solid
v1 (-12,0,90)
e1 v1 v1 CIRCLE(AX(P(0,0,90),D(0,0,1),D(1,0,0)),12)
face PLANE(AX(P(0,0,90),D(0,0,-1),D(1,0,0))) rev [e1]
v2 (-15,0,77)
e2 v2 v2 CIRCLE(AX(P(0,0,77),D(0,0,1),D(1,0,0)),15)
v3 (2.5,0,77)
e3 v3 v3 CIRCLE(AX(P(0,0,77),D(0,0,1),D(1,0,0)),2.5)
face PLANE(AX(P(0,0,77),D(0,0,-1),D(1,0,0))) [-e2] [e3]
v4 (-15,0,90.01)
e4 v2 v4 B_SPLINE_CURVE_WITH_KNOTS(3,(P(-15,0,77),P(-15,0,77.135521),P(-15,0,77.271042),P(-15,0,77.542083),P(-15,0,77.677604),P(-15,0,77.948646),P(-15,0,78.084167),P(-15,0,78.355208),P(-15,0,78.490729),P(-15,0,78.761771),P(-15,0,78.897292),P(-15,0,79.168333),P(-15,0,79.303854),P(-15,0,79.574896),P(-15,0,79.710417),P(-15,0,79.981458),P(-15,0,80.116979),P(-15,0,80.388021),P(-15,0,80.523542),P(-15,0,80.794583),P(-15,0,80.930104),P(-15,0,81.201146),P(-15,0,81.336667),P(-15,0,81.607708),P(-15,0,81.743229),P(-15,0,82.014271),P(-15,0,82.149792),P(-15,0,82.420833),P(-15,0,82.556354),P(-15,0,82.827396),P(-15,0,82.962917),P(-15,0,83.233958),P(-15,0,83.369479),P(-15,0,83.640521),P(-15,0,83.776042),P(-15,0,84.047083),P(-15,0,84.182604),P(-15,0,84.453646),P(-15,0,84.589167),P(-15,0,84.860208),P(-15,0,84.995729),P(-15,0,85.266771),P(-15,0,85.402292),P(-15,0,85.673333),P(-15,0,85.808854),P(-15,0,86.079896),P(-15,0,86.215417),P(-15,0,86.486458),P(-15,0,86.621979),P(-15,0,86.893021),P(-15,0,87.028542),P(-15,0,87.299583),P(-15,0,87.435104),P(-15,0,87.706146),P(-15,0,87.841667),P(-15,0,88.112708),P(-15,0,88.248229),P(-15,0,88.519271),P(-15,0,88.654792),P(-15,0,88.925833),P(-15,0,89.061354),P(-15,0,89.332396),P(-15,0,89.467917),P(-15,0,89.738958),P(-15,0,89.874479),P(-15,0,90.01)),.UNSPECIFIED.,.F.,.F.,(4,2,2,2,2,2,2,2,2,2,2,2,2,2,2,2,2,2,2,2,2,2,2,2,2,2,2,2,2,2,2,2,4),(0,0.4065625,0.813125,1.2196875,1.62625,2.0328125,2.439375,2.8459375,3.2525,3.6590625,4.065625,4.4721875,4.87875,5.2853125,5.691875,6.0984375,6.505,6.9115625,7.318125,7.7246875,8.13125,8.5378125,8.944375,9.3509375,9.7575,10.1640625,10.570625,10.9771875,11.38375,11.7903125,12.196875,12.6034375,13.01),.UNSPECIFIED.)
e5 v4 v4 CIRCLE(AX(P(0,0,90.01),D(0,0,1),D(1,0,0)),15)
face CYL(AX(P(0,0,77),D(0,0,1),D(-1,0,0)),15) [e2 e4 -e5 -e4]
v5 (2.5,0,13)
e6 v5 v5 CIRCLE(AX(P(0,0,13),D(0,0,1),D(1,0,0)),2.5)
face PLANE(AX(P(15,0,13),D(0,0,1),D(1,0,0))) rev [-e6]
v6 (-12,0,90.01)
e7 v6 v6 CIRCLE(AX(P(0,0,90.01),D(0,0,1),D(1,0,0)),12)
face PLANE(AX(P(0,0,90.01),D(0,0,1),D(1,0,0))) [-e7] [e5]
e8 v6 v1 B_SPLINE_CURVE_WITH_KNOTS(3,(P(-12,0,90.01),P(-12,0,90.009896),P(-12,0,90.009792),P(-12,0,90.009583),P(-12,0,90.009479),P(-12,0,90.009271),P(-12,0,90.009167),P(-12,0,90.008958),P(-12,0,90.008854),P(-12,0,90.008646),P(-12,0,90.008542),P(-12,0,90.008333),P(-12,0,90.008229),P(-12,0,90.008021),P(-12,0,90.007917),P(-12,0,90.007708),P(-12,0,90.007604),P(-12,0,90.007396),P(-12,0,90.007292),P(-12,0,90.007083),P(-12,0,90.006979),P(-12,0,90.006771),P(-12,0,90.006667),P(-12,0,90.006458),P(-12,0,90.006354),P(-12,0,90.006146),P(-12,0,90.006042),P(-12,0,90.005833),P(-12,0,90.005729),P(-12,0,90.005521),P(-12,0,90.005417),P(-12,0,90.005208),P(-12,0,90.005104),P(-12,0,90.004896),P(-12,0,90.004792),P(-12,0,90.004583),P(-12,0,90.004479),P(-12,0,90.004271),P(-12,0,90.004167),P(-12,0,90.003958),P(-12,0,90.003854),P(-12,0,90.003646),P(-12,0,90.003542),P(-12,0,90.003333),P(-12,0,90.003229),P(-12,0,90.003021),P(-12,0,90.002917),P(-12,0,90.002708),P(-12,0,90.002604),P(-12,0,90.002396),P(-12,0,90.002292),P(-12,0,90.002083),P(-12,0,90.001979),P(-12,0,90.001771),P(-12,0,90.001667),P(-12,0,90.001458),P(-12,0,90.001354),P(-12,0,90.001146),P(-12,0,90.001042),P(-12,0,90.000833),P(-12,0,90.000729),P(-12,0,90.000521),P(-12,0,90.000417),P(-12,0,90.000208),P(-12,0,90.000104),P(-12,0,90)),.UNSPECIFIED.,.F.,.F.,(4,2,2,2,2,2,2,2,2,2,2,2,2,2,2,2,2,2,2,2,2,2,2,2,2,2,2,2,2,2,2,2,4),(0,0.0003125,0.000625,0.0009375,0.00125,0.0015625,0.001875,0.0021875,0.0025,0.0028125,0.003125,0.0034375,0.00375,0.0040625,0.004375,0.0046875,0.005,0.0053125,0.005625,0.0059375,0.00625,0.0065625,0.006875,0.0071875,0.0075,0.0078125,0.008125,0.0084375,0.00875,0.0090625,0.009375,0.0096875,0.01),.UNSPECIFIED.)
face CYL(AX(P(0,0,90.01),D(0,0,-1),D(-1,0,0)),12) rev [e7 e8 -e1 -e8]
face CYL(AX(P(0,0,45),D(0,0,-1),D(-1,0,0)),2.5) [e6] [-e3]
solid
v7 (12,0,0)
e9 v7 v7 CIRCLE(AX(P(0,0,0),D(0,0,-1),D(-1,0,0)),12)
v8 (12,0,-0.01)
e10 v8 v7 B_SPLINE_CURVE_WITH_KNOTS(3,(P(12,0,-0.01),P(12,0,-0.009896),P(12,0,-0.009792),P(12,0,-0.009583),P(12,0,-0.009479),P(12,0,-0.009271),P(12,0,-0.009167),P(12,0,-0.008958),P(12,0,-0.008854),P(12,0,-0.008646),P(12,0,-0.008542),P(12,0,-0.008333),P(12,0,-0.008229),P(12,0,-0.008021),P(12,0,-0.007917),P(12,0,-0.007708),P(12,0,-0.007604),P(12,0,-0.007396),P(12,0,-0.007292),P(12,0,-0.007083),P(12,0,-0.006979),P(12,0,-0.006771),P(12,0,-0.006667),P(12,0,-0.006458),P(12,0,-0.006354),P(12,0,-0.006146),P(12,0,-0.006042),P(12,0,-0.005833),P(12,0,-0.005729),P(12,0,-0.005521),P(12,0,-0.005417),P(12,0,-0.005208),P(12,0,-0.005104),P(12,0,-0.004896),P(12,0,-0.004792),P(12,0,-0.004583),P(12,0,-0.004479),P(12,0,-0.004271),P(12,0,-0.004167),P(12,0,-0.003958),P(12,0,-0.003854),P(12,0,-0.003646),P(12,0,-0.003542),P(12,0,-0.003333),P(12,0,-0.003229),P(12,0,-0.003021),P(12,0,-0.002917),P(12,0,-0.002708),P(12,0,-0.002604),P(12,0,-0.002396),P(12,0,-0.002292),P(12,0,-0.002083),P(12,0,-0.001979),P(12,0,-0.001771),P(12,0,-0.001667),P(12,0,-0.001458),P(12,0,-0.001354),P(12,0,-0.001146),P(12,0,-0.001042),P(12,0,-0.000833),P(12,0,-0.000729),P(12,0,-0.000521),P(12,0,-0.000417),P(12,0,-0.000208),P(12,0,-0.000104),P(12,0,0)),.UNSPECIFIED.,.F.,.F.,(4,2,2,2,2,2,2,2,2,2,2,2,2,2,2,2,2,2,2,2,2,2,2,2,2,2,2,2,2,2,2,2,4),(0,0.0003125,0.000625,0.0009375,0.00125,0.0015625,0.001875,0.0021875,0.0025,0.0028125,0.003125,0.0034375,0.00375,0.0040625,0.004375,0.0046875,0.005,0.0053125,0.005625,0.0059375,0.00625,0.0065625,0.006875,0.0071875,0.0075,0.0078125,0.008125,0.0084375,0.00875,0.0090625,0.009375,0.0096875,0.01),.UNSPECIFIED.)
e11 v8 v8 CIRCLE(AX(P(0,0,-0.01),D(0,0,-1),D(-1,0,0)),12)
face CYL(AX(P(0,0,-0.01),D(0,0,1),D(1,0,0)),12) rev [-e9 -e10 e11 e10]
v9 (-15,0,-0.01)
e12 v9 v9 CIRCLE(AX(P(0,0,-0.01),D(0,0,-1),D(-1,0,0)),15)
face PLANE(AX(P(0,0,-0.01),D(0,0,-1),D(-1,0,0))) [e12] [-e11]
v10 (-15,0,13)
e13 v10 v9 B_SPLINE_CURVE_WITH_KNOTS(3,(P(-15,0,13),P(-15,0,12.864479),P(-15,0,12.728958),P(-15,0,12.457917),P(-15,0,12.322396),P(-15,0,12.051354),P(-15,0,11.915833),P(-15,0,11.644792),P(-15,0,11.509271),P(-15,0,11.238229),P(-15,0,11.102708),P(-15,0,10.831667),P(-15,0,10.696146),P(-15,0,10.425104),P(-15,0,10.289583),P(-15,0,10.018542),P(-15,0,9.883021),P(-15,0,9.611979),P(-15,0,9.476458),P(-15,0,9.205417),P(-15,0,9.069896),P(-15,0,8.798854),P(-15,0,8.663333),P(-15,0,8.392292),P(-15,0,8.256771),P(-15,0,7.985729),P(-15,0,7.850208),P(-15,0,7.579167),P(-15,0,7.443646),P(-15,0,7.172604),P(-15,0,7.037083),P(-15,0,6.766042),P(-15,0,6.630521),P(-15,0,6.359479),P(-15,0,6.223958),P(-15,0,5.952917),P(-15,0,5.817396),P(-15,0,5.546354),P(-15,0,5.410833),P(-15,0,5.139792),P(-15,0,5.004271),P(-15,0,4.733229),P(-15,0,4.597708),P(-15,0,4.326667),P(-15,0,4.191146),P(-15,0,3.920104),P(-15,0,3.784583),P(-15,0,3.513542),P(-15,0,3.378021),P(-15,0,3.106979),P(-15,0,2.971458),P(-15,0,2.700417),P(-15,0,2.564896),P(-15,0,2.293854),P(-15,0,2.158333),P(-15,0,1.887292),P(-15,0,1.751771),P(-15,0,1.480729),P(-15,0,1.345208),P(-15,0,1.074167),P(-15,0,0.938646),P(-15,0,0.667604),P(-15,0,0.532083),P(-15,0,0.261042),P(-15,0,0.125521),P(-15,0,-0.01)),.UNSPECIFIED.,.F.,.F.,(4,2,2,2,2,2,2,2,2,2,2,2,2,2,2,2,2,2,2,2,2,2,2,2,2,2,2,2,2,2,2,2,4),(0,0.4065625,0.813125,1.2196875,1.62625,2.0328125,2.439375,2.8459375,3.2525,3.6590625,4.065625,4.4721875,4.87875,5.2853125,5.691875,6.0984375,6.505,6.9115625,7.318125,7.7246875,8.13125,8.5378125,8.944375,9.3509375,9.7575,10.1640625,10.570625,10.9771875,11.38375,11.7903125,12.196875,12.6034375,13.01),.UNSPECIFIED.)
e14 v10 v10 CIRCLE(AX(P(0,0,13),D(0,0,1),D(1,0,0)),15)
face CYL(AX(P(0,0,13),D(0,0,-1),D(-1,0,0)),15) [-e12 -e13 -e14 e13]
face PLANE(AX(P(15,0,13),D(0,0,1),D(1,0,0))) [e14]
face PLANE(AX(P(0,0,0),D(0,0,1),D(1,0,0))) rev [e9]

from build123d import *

# Parameters (mm, degrees)
CROQUIS1_R              = 15
SALIENTE_EXTRUIR1_DEPTH = 13
CROQUIS2_R              = 2.5
SALIENTE_EXTRUIR2_DEPTH = 32
SALIENTE_EXTRUIR3_START = 0.01
CROQUIS3_R              = 15
CROQUIS3_R_2            = 12
SALIENTE_EXTRUIR3_DEPTH = 0.01
CROQUIS4_R              = 15
CROQUIS4_R_2            = 12
SALIENTE_EXTRUIR4_DEPTH = 0.01


with BuildPart() as part:
    # Croquis1 → Saliente-Extruir1 (new body)
    with BuildSketch(Plane.XY):
        Circle(CROQUIS1_R)
    saliente_extruir1 = extrude(amount=SALIENTE_EXTRUIR1_DEPTH)

    # Croquis2 → Saliente-Extruir2 (add)
    with BuildSketch(Plane.XY.offset(13)):
        Circle(CROQUIS2_R)
    saliente_extruir2 = extrude(amount=SALIENTE_EXTRUIR2_DEPTH)


with BuildPart() as body_2:
    # Partir1: the piece on the far side of the plane
    add(part.part)
    split(bisect_by=Plane.XY.offset(13), keep=Keep.BOTTOM)

    # Croquis4 → Saliente-Extruir4 (add)
    with BuildSketch(Plane(origin=(0, 0, 0), x_dir=(-1, 0, 0), z_dir=(0, 0, -1))):
        Circle(CROQUIS4_R)
        Circle(CROQUIS4_R_2, mode=Mode.SUBTRACT)
    extrude(amount=SALIENTE_EXTRUIR4_DEPTH)


with BuildPart() as part_1:
    add(part.part)

    # Partir1
    split(bisect_by=Plane.XY.offset(13), keep=Keep.TOP)

    # Simetría1: Saliente-Extruir1, Saliente-Extruir2 across plane
    add(saliente_extruir1.mirror(Plane.XY.offset(45)))
    add(saliente_extruir2.mirror(Plane.XY.offset(45)))

    # Croquis3 → Saliente-Extruir3 (add)
    with BuildSketch(Plane.XY.offset(90).offset(SALIENTE_EXTRUIR3_START)):
        Circle(CROQUIS3_R)
        Circle(CROQUIS3_R_2, mode=Mode.SUBTRACT)
    extrude(amount=-SALIENTE_EXTRUIR3_DEPTH)


solid = Compound([body_2.part, part_1.part])
